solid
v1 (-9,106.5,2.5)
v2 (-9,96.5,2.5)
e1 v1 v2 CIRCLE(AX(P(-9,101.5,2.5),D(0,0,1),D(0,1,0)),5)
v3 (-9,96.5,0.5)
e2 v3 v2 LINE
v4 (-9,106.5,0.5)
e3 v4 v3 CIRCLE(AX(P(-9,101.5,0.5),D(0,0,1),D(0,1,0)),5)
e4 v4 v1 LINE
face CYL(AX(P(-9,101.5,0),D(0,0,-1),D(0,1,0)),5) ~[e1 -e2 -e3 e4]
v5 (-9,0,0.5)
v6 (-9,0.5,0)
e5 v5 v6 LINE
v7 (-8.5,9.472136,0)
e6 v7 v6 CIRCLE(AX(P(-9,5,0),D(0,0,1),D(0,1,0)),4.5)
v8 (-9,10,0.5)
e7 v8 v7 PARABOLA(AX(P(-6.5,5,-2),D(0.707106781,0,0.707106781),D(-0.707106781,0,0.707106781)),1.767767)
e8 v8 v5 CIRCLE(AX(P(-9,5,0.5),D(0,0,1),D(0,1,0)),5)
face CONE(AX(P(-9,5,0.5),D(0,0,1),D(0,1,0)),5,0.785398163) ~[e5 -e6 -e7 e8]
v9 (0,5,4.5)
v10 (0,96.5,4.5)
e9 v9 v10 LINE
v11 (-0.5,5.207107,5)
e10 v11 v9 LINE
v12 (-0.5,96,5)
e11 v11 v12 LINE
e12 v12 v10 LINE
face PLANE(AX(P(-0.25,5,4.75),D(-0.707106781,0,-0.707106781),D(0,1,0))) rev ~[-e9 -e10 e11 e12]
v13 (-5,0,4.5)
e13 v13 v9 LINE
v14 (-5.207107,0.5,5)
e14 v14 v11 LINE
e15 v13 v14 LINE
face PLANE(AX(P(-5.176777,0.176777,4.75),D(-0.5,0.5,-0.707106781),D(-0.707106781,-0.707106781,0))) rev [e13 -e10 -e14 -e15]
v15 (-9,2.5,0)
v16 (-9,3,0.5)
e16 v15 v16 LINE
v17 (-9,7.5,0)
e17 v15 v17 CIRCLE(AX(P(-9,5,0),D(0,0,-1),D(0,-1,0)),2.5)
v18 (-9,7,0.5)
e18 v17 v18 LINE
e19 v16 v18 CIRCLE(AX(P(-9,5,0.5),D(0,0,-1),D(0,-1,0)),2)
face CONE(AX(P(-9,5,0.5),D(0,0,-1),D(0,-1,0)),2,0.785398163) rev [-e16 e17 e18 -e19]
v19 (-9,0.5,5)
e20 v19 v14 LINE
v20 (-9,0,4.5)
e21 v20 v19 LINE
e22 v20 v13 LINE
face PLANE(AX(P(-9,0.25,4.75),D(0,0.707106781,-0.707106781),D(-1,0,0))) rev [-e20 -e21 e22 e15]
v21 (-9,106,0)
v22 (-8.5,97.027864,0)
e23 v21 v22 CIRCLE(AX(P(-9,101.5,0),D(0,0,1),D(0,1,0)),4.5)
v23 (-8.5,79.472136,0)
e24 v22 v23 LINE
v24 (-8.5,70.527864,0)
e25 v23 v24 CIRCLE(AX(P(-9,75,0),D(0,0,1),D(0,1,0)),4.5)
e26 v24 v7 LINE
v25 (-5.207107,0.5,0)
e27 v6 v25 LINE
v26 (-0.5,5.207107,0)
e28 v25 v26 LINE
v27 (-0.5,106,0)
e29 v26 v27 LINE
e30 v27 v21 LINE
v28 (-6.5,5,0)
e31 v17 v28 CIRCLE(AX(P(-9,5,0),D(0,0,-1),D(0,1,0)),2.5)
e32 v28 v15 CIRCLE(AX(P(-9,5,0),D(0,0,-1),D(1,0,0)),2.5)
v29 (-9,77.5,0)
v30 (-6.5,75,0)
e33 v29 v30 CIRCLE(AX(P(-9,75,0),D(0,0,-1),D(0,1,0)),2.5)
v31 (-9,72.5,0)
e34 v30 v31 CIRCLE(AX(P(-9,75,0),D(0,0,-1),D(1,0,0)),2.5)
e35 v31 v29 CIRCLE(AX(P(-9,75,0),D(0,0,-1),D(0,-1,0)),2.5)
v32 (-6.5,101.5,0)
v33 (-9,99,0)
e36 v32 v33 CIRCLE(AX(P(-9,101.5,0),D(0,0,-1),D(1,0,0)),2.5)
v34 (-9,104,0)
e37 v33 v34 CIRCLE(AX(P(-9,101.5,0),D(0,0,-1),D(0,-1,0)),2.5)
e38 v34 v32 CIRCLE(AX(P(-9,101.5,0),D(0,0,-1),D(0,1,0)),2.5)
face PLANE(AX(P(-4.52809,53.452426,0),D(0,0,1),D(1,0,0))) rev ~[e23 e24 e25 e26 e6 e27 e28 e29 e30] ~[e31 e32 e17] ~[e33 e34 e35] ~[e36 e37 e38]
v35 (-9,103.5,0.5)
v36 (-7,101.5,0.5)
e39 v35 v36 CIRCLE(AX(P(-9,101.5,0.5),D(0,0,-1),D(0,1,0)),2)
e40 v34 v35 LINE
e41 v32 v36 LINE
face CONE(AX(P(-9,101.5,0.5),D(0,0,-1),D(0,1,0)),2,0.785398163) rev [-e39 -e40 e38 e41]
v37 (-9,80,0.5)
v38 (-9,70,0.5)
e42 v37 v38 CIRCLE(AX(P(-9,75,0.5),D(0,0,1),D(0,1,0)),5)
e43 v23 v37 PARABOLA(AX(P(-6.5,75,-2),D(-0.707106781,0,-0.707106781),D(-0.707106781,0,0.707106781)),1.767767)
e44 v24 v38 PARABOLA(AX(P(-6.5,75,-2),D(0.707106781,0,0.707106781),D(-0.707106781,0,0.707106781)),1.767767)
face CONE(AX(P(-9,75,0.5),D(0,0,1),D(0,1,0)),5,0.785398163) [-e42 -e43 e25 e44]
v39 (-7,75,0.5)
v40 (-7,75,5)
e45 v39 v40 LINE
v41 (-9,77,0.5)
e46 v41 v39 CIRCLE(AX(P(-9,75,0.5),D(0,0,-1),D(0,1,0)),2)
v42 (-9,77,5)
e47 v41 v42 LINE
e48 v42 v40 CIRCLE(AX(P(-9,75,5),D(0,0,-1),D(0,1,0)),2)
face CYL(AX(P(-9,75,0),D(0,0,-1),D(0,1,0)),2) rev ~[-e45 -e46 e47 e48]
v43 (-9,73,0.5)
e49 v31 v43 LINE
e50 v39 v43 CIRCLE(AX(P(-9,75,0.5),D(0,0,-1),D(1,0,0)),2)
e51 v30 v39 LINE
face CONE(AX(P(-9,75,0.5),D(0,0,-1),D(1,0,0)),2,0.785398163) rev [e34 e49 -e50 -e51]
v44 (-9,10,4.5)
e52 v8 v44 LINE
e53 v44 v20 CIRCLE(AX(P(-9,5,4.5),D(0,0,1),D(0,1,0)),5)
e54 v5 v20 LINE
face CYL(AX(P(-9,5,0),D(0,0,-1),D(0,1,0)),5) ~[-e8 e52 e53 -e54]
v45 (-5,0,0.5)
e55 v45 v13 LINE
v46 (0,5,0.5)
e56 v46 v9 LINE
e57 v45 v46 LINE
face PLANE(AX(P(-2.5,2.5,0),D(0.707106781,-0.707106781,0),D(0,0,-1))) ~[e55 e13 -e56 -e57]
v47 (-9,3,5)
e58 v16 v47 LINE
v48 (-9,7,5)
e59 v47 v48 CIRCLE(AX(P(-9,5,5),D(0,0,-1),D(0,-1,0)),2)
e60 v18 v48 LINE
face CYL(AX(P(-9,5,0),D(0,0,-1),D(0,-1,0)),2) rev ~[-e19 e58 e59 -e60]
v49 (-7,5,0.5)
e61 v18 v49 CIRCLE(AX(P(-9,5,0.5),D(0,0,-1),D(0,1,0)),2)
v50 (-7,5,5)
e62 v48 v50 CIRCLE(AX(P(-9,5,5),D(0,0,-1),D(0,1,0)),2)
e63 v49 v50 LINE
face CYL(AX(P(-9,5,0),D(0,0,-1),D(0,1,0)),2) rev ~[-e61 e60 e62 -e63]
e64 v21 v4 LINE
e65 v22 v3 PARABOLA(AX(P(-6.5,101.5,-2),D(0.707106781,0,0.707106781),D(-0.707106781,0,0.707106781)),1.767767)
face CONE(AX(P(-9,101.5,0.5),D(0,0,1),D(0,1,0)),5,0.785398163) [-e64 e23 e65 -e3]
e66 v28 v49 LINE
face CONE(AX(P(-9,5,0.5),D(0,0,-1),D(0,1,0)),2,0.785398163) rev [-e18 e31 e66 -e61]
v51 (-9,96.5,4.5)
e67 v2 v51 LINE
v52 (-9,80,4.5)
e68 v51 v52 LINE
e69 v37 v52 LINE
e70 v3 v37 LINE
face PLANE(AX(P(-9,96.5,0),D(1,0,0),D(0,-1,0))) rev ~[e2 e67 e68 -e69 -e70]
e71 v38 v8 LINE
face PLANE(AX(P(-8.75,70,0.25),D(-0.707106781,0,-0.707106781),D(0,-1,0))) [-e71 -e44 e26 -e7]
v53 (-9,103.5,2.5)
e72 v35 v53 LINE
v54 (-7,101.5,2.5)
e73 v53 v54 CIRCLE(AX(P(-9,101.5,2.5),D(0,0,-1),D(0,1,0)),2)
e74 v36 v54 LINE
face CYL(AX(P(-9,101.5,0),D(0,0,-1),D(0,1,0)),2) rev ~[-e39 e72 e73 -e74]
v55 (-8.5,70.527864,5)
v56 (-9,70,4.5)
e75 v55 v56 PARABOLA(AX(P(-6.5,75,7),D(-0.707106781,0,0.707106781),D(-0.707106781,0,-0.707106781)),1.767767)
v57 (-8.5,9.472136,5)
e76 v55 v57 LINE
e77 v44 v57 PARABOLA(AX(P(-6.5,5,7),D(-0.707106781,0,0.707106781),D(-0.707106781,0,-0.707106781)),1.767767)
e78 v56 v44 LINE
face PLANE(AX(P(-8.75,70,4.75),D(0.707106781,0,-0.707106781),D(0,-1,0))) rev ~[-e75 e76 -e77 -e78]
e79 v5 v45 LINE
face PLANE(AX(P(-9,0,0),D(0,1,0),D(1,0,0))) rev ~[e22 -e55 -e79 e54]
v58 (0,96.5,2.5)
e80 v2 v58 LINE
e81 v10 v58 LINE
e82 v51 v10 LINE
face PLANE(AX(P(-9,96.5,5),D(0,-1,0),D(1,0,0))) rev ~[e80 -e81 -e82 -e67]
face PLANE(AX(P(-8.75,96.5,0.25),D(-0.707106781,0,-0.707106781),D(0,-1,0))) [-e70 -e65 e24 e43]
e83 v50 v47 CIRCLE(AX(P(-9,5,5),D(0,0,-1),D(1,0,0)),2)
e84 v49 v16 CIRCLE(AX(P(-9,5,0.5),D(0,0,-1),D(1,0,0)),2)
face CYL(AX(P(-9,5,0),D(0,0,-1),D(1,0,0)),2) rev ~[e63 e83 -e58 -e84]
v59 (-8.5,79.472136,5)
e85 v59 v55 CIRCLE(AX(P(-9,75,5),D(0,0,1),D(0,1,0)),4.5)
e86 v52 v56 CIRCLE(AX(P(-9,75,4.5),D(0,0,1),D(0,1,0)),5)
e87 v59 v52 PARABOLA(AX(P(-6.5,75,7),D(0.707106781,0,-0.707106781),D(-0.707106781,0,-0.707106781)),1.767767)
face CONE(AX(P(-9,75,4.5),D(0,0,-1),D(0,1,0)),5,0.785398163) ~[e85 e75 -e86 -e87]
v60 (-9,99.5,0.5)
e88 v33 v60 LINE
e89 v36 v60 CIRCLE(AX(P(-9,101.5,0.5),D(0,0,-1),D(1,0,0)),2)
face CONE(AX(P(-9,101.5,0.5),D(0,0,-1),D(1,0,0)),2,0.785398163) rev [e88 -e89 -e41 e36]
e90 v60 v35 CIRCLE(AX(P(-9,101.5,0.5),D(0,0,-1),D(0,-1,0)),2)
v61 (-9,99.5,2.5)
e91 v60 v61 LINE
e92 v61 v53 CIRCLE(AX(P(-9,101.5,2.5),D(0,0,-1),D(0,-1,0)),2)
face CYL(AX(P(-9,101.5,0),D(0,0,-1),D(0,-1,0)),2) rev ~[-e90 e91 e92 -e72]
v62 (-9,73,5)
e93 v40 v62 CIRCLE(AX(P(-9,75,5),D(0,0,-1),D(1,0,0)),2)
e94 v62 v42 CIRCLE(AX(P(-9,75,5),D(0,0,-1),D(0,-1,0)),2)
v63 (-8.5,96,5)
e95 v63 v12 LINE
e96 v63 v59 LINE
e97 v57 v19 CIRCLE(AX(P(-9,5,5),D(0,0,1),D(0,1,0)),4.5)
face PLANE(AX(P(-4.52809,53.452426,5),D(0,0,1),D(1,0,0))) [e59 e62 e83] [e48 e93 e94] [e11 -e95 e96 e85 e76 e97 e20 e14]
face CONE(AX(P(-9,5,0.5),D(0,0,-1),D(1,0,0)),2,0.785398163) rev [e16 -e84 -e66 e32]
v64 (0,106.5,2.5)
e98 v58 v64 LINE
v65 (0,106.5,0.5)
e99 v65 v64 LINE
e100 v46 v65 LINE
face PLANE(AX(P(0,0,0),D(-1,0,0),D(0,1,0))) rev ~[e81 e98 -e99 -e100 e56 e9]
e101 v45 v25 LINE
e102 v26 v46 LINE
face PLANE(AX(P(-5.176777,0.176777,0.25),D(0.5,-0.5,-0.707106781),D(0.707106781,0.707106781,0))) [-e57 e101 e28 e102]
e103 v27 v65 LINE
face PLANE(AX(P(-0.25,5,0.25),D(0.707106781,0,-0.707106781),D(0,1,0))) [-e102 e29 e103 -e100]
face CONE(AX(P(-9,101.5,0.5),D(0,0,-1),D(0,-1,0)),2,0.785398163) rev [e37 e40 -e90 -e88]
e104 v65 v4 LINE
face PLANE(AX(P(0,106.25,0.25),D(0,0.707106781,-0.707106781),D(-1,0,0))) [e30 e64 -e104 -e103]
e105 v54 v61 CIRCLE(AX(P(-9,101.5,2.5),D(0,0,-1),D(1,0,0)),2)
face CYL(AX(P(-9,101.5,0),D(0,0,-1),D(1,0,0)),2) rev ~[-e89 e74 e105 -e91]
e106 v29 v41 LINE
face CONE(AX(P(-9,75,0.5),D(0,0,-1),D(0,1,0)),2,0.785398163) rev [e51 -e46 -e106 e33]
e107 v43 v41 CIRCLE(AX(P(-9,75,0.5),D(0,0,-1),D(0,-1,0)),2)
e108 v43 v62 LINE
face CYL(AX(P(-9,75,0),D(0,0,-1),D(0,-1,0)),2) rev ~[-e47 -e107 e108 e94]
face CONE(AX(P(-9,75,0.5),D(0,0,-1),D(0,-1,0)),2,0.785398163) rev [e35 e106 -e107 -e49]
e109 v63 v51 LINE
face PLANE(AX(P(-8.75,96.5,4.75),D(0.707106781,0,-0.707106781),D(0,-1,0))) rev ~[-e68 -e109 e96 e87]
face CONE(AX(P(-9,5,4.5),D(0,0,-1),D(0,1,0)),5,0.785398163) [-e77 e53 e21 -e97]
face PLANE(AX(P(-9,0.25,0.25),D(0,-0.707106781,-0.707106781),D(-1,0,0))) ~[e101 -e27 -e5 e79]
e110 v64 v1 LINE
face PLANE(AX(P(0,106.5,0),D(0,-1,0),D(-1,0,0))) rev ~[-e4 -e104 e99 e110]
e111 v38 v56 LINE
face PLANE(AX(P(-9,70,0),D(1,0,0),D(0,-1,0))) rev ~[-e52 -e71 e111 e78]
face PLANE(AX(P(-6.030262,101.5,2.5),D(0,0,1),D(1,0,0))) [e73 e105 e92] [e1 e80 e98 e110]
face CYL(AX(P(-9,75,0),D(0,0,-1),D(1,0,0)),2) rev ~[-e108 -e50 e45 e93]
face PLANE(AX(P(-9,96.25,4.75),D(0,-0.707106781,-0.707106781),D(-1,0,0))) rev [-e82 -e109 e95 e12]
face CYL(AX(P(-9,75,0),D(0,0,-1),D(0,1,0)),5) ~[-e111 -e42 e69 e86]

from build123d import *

# Parameters (mm, degrees)
F1_DEPTH = 5
F3_DEPTH = 2.5
F4_SIZE  = 5
F5_SIZE  = 0.5


with BuildPart() as f1:
    # F0 (on Top) → F1 (new body)
    with BuildSketch(Plane.XY):
        with BuildLine():
            Line((-9, 0), (0, 0))
            Line((0, 0), (0, 106.5))
            Line((0, 106.5), (-9, 106.5))
            Line((-9, 106.5), (-9, 103.5))
            ThreePointArc((-9, 103.5), (-7.5857864376, 102.9142135624), (-7, 101.5))
            ThreePointArc((-7, 101.5), (-7.5857864376, 100.0857864376), (-9, 99.5))
            Line((-9, 99.5), (-9, 96.5))
            Line((-9, 96.5), (-9, 80))
            Line((-9, 80), (-9, 77))
            ThreePointArc((-9, 77), (-7.5857864376, 76.4142135624), (-7, 75))
            ThreePointArc((-7, 75), (-7.5857864376, 73.5857864376), (-9, 73))
            Line((-9, 73), (-9, 70))
            Line((-9, 70), (-9, 10))
            Line((-9, 10), (-9, 7))
            ThreePointArc((-9, 7), (-7.5857864376, 6.4142135624), (-7, 5))
            ThreePointArc((-7, 5), (-7.5857864376, 3.5857864376), (-9, 3))
            Line((-9, 3), (-9, 0))
        make_face()
        with BuildLine():
            ThreePointArc((-9, 10), (-14, 5), (-9, 0))
            Line((-9, 0), (-9, 3))
            ThreePointArc((-9, 3), (-11, 5), (-9, 7))
            Line((-9, 7), (-9, 10))
        make_face()
        with BuildLine():
            Line((-9, 103.5), (-9, 106.5))
            ThreePointArc((-9, 106.5), (-14, 101.5), (-9, 96.5))
            Line((-9, 96.5), (-9, 99.5))
            ThreePointArc((-9, 99.5), (-11, 101.5), (-9, 103.5))
        make_face()
        with BuildLine():
            ThreePointArc((-9, 80), (-14, 75), (-9, 70))
            Line((-9, 70), (-9, 73))
            ThreePointArc((-9, 73), (-11, 75), (-9, 77))
            Line((-9, 77), (-9, 80))
        make_face()
    extrude(amount=F1_DEPTH)

    # F2 (on face) → F3 (cut)
    with BuildSketch(Plane.XY.offset(5)):
        with BuildLine():
            ThreePointArc((-9, 106.5), (-14, 101.5), (-9, 96.5))
            Line((-9, 96.5), (0, 96.5))
            Line((0, 96.5), (0, 106.5))
            Line((0, 106.5), (-9, 106.5))
        make_face()
    extrude(amount=-F3_DEPTH, mode=Mode.SUBTRACT)

    # F4
    f4_edges = [f1.edges().sort_by_distance(p)[0] for p in [
        (0, 0, 2.5),
    ]]
    chamfer(f4_edges, length=F4_SIZE)

    # F5
    f5_edges = [f1.edges().sort_by_distance(p)[0] for p in [
        (-7, 0, 0),
        (-2.5, 2.5, 0),
        (-14, 5, 0),
        (0, 55.75, 0),
        (-9, 40, 0),
        (-4.5, 106.5, 0),
        (-14, 75, 0),
        (-14, 101.5, 0),
        (-9, 88.25, 0),
        (-9, 77, 0),
        (-9, 103.5, 0),
        (-11, 5, 0),
        (-4.5, 96.5, 5),
        (0, 50.75, 5),
        (-9, 88.25, 5),
        (-14, 75, 5),
        (-2.5, 2.5, 5),
        (-7, 0, 5),
        (-14, 5, 5),
        (-9, 40, 5),
    ]]
    chamfer(f5_edges, length=F5_SIZE)


solid = f1.part
